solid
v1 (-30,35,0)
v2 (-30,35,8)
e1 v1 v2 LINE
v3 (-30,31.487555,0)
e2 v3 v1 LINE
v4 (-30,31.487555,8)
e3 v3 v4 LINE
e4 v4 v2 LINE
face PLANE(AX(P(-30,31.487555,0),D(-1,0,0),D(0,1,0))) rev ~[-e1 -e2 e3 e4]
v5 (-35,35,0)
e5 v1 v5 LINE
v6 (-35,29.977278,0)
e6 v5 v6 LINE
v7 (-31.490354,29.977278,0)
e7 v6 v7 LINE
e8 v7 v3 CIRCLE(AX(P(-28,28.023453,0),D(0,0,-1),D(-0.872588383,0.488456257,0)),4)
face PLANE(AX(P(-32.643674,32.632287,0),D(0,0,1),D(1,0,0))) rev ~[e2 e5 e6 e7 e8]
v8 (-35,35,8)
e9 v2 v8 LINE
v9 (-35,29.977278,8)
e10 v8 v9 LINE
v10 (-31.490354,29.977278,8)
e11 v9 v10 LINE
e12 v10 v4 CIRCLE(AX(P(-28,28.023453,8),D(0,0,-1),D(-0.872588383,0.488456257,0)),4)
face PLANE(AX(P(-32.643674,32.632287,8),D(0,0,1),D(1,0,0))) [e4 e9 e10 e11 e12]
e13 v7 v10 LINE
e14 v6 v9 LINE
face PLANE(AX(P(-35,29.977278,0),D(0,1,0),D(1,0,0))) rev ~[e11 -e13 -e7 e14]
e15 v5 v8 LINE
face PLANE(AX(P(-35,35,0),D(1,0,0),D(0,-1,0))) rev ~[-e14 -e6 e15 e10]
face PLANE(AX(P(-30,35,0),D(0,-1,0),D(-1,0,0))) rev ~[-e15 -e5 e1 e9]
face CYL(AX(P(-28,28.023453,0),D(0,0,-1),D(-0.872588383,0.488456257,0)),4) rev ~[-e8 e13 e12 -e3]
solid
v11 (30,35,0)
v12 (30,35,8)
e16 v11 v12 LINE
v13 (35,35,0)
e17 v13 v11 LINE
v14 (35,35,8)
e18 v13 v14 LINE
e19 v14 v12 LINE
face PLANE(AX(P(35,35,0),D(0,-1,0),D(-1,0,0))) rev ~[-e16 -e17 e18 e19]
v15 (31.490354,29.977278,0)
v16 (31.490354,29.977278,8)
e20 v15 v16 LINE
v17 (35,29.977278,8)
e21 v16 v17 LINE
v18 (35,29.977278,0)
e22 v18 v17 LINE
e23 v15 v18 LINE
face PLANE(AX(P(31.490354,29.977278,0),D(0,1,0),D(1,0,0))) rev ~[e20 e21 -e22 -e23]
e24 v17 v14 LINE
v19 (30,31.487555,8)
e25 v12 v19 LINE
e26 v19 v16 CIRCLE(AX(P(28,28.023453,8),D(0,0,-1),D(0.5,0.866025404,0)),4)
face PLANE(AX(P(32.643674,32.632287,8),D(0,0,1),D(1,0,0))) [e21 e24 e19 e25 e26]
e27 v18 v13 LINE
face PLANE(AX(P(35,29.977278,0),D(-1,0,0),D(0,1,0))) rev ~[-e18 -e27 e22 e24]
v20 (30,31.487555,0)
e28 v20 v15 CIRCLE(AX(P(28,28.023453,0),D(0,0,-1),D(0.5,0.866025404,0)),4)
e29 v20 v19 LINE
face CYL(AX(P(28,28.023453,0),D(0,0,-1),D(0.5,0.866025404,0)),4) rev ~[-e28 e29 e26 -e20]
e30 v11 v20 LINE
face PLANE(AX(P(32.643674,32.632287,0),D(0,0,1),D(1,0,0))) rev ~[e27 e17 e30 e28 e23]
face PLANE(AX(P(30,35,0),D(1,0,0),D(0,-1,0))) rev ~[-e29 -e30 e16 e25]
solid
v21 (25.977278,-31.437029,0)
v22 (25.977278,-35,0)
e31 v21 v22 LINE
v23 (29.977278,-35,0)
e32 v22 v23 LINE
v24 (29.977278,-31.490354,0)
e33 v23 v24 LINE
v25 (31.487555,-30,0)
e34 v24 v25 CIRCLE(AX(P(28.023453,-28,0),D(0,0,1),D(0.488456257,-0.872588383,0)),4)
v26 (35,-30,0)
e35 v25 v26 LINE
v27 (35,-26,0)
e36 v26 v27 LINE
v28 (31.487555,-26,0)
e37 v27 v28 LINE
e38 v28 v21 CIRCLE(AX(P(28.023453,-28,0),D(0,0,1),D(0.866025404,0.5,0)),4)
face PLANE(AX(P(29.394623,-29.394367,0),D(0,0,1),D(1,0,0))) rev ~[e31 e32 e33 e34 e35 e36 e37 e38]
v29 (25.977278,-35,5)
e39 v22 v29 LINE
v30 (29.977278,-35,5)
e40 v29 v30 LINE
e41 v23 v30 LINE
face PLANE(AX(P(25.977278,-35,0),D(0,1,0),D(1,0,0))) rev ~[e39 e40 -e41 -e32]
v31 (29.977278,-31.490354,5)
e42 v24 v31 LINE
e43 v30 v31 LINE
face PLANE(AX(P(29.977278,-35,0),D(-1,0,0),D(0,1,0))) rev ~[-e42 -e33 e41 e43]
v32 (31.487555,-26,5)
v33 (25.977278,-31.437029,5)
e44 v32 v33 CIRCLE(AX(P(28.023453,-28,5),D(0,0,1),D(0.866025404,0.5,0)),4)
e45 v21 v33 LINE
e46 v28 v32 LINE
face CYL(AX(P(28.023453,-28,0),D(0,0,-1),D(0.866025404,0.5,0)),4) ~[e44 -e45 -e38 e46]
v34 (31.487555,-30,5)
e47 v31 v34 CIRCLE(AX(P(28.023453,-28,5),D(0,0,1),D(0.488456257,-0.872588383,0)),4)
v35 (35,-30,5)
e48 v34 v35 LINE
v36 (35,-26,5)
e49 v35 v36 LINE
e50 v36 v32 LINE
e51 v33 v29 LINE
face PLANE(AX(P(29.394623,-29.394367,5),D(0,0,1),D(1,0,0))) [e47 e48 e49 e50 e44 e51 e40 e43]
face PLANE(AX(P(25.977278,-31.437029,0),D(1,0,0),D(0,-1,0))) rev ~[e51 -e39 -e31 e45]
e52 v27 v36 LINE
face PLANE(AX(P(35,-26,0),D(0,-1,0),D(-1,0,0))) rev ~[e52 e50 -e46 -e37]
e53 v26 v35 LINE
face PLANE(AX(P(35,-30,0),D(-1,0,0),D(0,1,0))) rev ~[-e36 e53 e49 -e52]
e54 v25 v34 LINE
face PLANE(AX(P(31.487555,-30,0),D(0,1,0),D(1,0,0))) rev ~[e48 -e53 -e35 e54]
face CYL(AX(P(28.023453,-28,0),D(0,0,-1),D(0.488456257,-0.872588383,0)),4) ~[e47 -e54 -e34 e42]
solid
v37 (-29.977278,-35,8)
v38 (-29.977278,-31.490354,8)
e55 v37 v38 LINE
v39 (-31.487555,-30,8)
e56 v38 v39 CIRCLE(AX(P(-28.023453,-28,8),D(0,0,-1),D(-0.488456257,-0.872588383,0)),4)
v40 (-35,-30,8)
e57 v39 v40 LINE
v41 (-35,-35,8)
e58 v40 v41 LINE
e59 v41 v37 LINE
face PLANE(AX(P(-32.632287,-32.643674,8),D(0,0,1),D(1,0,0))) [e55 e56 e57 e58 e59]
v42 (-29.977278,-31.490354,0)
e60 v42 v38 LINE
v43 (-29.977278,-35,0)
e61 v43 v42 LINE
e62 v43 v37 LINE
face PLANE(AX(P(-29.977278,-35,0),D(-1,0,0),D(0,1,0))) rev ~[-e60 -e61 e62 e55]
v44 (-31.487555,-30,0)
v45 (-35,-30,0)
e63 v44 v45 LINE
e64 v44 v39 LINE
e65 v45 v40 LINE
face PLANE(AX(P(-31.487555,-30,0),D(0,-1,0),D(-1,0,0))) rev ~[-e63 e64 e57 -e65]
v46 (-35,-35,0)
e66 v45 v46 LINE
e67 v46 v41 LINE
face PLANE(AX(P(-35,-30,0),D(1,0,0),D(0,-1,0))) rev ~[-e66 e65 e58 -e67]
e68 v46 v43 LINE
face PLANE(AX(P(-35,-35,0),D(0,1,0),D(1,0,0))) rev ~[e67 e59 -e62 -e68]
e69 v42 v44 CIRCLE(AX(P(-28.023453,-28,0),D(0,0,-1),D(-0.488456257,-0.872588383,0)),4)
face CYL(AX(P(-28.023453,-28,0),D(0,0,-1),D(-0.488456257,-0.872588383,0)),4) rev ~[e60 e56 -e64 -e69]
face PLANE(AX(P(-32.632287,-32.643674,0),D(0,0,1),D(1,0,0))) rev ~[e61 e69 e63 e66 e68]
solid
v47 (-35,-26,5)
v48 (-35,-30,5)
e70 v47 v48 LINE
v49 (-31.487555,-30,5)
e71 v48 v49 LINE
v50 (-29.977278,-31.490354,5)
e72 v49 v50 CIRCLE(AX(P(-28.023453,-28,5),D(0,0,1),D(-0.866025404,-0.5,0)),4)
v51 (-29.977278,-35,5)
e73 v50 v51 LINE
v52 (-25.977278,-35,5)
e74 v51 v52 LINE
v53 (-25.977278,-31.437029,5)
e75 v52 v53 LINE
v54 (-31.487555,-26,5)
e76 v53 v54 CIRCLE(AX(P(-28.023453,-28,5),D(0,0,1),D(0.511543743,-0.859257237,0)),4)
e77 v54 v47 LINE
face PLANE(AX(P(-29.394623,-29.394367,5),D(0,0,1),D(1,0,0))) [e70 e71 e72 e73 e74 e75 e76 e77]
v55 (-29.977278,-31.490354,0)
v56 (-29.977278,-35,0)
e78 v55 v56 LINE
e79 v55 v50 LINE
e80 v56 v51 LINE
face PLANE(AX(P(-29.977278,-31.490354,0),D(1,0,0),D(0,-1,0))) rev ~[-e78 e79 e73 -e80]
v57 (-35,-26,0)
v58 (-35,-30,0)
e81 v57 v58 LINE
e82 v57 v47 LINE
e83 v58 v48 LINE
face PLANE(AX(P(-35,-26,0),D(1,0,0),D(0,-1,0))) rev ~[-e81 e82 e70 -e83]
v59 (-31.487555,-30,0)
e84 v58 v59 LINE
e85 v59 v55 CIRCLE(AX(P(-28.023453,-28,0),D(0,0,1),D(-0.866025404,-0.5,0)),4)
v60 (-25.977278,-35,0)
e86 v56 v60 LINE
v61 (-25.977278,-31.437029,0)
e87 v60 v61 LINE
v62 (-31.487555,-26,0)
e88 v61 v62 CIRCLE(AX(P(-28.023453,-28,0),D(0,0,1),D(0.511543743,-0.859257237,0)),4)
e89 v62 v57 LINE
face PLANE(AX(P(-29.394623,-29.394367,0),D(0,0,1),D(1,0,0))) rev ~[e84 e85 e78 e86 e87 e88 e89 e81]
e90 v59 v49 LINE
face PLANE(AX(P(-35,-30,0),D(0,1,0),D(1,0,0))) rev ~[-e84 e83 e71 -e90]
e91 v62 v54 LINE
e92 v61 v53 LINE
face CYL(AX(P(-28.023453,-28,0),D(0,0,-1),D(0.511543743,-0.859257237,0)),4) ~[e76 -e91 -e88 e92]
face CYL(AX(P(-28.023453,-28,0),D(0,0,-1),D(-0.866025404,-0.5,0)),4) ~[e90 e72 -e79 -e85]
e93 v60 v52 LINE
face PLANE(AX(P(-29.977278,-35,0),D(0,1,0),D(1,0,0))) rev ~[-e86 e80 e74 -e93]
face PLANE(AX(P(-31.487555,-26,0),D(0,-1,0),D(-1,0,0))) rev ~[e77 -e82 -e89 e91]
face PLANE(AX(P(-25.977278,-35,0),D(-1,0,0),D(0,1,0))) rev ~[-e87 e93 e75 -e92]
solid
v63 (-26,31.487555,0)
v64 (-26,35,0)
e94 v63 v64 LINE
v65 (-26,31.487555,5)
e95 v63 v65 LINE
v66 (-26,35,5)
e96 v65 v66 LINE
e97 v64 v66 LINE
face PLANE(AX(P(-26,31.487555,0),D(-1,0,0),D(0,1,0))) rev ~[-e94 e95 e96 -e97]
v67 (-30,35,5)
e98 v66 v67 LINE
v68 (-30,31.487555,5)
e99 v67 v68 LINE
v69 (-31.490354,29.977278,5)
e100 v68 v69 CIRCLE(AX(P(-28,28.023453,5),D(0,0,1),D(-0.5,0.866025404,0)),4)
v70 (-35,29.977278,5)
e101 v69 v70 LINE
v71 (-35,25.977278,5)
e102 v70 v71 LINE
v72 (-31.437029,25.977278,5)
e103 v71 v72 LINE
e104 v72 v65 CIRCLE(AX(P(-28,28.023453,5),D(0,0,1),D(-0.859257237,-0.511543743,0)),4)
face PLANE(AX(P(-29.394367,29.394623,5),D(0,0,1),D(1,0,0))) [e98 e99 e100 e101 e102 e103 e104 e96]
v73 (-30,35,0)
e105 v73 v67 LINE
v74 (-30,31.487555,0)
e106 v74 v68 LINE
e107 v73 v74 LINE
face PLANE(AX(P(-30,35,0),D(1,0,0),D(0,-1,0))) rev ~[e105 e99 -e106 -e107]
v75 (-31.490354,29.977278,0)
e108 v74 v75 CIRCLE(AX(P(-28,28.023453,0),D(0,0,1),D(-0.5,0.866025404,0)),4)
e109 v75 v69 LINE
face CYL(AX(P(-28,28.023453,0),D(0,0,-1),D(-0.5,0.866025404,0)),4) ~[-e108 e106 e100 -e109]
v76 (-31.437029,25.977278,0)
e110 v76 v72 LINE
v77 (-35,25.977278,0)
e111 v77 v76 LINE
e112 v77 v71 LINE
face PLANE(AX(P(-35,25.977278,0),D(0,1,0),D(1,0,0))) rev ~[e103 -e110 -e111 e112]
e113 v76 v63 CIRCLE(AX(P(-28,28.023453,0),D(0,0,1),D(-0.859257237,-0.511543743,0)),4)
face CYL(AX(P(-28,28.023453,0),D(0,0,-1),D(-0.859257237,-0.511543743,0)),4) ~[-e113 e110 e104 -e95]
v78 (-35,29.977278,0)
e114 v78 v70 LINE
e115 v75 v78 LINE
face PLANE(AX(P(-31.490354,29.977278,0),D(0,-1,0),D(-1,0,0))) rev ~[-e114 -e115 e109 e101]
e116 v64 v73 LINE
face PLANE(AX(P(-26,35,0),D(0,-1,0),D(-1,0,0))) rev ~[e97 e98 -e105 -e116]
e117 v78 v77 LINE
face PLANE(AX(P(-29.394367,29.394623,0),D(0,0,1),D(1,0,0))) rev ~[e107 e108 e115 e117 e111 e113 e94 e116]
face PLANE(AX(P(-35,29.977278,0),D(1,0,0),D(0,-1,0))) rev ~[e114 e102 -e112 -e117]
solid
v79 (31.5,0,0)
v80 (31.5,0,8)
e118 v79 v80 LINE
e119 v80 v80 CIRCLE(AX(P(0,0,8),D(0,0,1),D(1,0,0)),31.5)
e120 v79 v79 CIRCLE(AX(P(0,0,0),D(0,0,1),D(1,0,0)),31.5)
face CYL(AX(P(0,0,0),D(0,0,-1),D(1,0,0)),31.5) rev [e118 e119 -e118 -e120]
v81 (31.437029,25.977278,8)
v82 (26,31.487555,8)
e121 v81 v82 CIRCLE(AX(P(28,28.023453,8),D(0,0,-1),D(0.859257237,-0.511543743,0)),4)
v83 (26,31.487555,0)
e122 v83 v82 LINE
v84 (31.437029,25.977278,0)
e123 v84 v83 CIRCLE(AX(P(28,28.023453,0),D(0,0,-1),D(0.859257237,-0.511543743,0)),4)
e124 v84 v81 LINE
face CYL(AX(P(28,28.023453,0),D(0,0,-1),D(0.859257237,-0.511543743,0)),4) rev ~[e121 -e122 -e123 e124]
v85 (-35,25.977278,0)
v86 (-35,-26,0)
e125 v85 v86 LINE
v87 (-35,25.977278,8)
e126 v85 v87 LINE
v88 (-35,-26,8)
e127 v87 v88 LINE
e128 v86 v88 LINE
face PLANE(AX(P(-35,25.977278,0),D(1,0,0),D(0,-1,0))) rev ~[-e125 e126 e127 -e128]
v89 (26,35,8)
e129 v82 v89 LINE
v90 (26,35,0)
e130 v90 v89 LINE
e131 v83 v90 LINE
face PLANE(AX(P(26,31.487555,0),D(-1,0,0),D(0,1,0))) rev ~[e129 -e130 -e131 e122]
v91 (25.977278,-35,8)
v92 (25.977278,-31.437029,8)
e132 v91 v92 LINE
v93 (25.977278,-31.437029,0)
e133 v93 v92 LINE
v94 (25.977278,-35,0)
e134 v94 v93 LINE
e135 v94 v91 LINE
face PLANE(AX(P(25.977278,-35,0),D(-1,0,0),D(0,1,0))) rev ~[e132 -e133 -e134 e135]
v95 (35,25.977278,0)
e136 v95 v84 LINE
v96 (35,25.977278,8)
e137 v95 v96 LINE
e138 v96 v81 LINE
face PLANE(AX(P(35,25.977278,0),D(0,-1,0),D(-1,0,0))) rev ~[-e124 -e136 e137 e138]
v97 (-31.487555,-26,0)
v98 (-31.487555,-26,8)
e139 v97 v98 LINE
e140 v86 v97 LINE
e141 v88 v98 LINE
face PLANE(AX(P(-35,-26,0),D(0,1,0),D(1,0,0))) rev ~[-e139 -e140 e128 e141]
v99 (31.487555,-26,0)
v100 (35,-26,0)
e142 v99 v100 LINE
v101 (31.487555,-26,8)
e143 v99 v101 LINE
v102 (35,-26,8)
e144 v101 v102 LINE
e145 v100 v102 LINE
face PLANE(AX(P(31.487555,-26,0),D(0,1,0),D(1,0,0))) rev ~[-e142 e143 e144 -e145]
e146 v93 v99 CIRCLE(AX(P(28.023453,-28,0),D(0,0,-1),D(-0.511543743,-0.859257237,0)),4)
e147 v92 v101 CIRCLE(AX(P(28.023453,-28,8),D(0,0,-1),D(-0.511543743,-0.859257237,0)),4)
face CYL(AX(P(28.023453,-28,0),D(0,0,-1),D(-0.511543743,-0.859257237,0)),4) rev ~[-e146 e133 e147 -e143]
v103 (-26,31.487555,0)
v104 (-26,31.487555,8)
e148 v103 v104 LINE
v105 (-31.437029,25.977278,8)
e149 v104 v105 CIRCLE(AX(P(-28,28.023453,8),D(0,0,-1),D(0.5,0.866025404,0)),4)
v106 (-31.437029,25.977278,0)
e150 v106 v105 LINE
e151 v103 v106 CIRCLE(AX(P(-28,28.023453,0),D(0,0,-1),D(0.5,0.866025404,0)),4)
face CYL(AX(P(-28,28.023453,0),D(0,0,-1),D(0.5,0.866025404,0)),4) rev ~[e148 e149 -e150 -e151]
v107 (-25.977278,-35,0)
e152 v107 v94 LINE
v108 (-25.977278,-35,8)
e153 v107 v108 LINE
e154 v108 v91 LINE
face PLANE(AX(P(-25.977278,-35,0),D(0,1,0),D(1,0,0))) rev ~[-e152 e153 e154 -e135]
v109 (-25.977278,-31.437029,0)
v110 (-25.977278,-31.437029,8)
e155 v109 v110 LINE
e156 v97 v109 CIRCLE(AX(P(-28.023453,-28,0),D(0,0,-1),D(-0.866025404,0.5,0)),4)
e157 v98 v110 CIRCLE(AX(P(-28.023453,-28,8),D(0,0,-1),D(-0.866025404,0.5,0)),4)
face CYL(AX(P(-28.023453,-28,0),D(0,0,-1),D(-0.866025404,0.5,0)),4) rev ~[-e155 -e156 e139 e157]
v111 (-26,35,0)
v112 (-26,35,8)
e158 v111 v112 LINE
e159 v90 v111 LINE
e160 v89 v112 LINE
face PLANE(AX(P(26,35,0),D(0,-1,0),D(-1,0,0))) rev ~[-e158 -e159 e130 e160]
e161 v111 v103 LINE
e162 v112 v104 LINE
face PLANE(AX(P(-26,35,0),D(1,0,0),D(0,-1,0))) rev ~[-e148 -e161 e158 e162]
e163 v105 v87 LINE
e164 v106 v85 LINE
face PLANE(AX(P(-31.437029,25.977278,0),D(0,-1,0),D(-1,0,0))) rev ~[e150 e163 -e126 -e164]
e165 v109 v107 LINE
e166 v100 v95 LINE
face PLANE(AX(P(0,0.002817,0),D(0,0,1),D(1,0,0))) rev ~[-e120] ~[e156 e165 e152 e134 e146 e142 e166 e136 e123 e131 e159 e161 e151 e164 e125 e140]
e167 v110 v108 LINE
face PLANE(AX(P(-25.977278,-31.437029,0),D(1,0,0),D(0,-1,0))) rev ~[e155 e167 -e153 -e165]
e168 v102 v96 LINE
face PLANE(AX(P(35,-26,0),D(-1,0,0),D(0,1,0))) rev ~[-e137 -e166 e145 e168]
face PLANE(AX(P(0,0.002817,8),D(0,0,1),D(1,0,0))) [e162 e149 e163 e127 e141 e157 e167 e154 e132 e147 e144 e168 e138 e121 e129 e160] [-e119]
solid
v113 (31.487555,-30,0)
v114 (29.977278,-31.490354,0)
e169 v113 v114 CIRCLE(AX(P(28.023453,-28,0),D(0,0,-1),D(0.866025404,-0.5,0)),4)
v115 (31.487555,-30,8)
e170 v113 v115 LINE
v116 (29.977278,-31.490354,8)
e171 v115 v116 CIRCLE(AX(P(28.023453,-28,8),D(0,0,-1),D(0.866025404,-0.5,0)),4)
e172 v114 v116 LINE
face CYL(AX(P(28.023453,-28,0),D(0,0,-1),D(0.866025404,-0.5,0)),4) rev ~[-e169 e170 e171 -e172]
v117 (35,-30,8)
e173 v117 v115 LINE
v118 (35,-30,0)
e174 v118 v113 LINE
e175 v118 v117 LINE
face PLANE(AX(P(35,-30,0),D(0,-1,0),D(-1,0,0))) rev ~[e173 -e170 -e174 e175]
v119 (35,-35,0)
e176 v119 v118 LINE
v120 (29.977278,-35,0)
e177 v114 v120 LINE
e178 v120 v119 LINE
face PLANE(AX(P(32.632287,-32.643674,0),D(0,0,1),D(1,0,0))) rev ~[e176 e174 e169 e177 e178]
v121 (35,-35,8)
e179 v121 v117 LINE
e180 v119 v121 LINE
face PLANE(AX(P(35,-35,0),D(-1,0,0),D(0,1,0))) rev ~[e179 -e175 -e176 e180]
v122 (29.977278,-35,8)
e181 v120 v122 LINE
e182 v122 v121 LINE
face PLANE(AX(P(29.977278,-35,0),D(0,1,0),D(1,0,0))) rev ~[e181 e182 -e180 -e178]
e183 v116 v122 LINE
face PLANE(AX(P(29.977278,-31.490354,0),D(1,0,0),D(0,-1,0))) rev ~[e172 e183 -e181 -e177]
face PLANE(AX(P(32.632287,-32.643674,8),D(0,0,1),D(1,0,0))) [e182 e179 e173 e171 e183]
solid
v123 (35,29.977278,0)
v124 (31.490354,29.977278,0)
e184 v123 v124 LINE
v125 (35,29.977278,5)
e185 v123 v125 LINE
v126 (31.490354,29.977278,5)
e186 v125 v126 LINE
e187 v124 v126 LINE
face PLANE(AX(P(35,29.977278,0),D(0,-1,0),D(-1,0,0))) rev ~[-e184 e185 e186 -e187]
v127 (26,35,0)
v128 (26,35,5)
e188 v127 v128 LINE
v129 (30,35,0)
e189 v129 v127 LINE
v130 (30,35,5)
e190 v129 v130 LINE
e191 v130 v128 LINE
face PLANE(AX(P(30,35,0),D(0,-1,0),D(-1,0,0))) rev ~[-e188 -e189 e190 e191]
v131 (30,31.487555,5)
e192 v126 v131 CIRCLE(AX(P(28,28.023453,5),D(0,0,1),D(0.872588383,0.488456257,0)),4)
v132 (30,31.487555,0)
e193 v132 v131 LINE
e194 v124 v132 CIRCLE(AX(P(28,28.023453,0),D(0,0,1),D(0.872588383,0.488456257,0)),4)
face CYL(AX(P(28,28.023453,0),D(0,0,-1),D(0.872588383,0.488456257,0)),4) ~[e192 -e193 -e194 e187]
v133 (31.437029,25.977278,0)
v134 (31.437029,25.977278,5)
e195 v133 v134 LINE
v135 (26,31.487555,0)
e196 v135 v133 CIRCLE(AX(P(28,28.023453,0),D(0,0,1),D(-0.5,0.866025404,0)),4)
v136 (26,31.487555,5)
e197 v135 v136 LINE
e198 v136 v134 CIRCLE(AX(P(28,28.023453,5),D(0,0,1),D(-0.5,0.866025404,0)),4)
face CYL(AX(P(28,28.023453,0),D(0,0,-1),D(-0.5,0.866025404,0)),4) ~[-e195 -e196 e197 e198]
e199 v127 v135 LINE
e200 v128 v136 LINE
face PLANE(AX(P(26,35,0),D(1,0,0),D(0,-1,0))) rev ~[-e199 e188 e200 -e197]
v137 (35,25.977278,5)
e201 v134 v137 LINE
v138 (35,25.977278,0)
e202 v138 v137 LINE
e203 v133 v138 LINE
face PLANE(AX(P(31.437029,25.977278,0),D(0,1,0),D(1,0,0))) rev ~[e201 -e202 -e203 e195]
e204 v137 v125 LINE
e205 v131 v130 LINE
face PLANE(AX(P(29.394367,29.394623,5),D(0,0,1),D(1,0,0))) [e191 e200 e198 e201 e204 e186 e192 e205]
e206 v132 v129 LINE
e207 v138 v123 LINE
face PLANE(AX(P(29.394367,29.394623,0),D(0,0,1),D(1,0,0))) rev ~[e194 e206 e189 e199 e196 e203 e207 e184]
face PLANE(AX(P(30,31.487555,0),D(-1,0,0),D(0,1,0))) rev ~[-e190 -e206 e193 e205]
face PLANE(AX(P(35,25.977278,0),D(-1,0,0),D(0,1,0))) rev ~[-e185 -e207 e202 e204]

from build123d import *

# Parameters (mm, degrees)
F0_R     = 31.5
F1_DEPTH = 8
F3_DEPTH = 8
F4_DEPTH = 5
F5_DEPTH = 8
F6_DEPTH = 5


# Not quite as in the source:
# - a feature names something its author has since deleted; it is built from what else it names


with BuildPart() as f1:
    # F0 (on Top) → F1 (new body)
    with BuildSketch(Plane.XY):
        with BuildLine():
            Line((-31.4370289465, 25.9772784561), (-35, 25.9772784561))
            Line((-35, 25.9772784561), (-35, -26))
            Line((-35, -26), (-31.4875550445, -26))
            ThreePointArc((-31.4875550445, -26), (-25.2140139956, -25.1527118045), (-25.9772784561, -31.4370289465))
            Line((-25.9772784561, -31.4370289465), (-25.9772784561, -35))
            Line((-25.9772784561, -35), (25.9772784561, -35))
            Line((25.9772784561, -35), (25.9772784561, -31.4370289465))
            ThreePointArc((25.9772784561, -31.4370289465), (25.2140139956, -25.1527118045), (31.4875550445, -26))
            Line((31.4875550445, -26), (35, -26))
            Line((35, -26), (35, -25.5))
            Line((35, -25.5), (35, 25.9772784561))
            Line((35, 25.9772784561), (31.4370289465, 25.9772784561))
            ThreePointArc((31.4370289465, 25.9772784561), (25.1527118045, 25.2140139956), (26, 31.4875550445))
            Line((26, 31.4875550445), (26, 35))
            Line((26, 35), (-25.5, 35))
            Line((-25.5, 35), (-26, 35))
            Line((-26, 35), (-26, 31.4875550445))
            ThreePointArc((-26, 31.4875550445), (-25.1527118045, 25.2140139956), (-31.4370289465, 25.9772784561))
        make_face()
        Circle(F0_R, mode=Mode.SUBTRACT)
    extrude(amount=F1_DEPTH)


with BuildPart() as f3:
    # F0 (on Top) → F3 (new body)
    with BuildSketch(Plane.XY):
        with BuildLine():
            Line((-31.9894003868, 35), (-35, 35))
            Line((-35, 35), (-35, 29.9772784561))
            Line((-35, 29.9772784561), (-31.4903535301, 29.9772784561))
            ThreePointArc((-31.4903535301, 29.9772784561), (-30.8471440629, 30.83303893), (-30, 31.4875550445))
            Line((-30, 31.4875550445), (-30, 35))
            Line((-30, 35), (-30.5, 35))
            Line((-30.5, 35), (-31.9894003868, 35))
        make_face()
    extrude(amount=F3_DEPTH)


with BuildPart() as f4:
    # F0 (on Top) → F4 (new body)
    with BuildSketch(Plane.XY):
        with BuildLine():
            Line((-31.4903535301, 29.9772784561), (-35, 29.9772784561))
            Line((-35, 29.9772784561), (-35, 25.9772784561))
            Line((-35, 25.9772784561), (-31.4370289465, 25.9772784561))
            ThreePointArc((-31.4370289465, 25.9772784561), (-25.1527118045, 25.2140139956), (-26, 31.4875550445))
            Line((-26, 31.4875550445), (-26, 35))
            Line((-26, 35), (-28, 35))
            Line((-28, 35), (-30, 35))
            Line((-30, 35), (-30, 31.4875550445))
            ThreePointArc((-30, 31.4875550445), (-30.8471440629, 30.83303893), (-31.4903535301, 29.9772784561))
        make_face()
    extrude(amount=F4_DEPTH)


with BuildPart() as f5:
    # F0 (on Top) → F5 (new body)
    with BuildSketch(Plane.XY):
        with BuildLine():
            Line((29.9772784561, -31.4903535301), (29.9772784561, -35))
            Line((29.9772784561, -35), (30.5105996132, -35))
            Line((30.5105996132, -35), (35, -35))
            Line((35, -35), (35, -31.9894003868))
            Line((35, -31.9894003868), (35, -30.5))
            Line((35, -30.5), (35, -30))
            Line((35, -30), (31.4875550445, -30))
            ThreePointArc((31.4875550445, -30), (30.83303893, -30.8471440629), (29.9772784561, -31.4903535301))
        make_face()
    extrude(amount=F5_DEPTH)


with BuildPart() as f5b:
    # F0 (on Top) → F5, piece 2 (new body)
    with BuildSketch(Plane.XY):
        with BuildLine():
            Line((-31.4875550445, -30), (-35, -30))
            Line((-35, -30), (-35, -35))
            Line((-35, -35), (-29.9772784561, -35))
            Line((-29.9772784561, -35), (-29.9772784561, -31.4903535301))
            ThreePointArc((-29.9772784561, -31.4903535301), (-30.83303893, -30.8471440629), (-31.4875550445, -30))
        make_face()
    extrude(amount=F5_DEPTH)


with BuildPart() as f5c:
    # F0 (on Top) → F5, piece 3 (new body)
    with BuildSketch(Plane.XY):
        with BuildLine():
            Line((31.9894003868, 35), (30, 35))
            Line((30, 35), (30, 31.4875550445))
            ThreePointArc((30, 31.4875550445), (30.8471440629, 30.83303893), (31.4903535301, 29.9772784561))
            Line((31.4903535301, 29.9772784561), (35, 29.9772784561))
            Line((35, 29.9772784561), (35, 35))
            Line((35, 35), (31.9894003868, 35))
        make_face()
    extrude(amount=F5_DEPTH)


with BuildPart() as f6:
    # F0 (on Top) → F6 (new body)
    with BuildSketch(Plane.XY):
        with BuildLine():
            Line((25.9772784561, -31.4370289465), (25.9772784561, -35))
            Line((25.9772784561, -35), (29.9772784561, -35))
            Line((29.9772784561, -35), (29.9772784561, -31.4903535301))
            ThreePointArc((29.9772784561, -31.4903535301), (30.83303893, -30.8471440629), (31.4875550445, -30))
            Line((31.4875550445, -30), (35, -30))
            Line((35, -30), (35, -28))
            Line((35, -28), (35, -26))
            Line((35, -26), (31.4875550445, -26))
            ThreePointArc((31.4875550445, -26), (25.2140139956, -25.1527118045), (25.9772784561, -31.4370289465))
        make_face()
    extrude(amount=F6_DEPTH)


with BuildPart() as f6b:
    # F0 (on Top) → F6, piece 2 (new body)
    with BuildSketch(Plane.XY):
        with BuildLine():
            Line((-31.4875550445, -26), (-35, -26))
            Line((-35, -26), (-35, -30))
            Line((-35, -30), (-31.4875550445, -30))
            ThreePointArc((-31.4875550445, -30), (-30.83303893, -30.8471440629), (-29.9772784561, -31.4903535301))
            Line((-29.9772784561, -31.4903535301), (-29.9772784561, -35))
            Line((-29.9772784561, -35), (-25.9772784561, -35))
            Line((-25.9772784561, -35), (-25.9772784561, -31.4370289465))
            ThreePointArc((-25.9772784561, -31.4370289465), (-25.2140139956, -25.1527118045), (-31.4875550445, -26))
        make_face()
    extrude(amount=F6_DEPTH)


with BuildPart() as f6c:
    # F0 (on Top) → F6, piece 3 (new body)
    with BuildSketch(Plane.XY):
        with BuildLine():
            Line((28, 35), (26, 35))
            Line((26, 35), (26, 31.4875550445))
            ThreePointArc((26, 31.4875550445), (25.1527118045, 25.2140139956), (31.4370289465, 25.9772784561))
            Line((31.4370289465, 25.9772784561), (35, 25.9772784561))
            Line((35, 25.9772784561), (35, 29.9772784561))
            Line((35, 29.9772784561), (31.4903535301, 29.9772784561))
            ThreePointArc((31.4903535301, 29.9772784561), (30.8471440629, 30.83303893), (30, 31.4875550445))
            Line((30, 31.4875550445), (30, 35))
            Line((30, 35), (28, 35))
        make_face()
    extrude(amount=F6_DEPTH)


solid = Compound([f1.part, f3.part, f4.part, f5.part, f5b.part, f5c.part, f6.part, f6b.part, f6c.part])
